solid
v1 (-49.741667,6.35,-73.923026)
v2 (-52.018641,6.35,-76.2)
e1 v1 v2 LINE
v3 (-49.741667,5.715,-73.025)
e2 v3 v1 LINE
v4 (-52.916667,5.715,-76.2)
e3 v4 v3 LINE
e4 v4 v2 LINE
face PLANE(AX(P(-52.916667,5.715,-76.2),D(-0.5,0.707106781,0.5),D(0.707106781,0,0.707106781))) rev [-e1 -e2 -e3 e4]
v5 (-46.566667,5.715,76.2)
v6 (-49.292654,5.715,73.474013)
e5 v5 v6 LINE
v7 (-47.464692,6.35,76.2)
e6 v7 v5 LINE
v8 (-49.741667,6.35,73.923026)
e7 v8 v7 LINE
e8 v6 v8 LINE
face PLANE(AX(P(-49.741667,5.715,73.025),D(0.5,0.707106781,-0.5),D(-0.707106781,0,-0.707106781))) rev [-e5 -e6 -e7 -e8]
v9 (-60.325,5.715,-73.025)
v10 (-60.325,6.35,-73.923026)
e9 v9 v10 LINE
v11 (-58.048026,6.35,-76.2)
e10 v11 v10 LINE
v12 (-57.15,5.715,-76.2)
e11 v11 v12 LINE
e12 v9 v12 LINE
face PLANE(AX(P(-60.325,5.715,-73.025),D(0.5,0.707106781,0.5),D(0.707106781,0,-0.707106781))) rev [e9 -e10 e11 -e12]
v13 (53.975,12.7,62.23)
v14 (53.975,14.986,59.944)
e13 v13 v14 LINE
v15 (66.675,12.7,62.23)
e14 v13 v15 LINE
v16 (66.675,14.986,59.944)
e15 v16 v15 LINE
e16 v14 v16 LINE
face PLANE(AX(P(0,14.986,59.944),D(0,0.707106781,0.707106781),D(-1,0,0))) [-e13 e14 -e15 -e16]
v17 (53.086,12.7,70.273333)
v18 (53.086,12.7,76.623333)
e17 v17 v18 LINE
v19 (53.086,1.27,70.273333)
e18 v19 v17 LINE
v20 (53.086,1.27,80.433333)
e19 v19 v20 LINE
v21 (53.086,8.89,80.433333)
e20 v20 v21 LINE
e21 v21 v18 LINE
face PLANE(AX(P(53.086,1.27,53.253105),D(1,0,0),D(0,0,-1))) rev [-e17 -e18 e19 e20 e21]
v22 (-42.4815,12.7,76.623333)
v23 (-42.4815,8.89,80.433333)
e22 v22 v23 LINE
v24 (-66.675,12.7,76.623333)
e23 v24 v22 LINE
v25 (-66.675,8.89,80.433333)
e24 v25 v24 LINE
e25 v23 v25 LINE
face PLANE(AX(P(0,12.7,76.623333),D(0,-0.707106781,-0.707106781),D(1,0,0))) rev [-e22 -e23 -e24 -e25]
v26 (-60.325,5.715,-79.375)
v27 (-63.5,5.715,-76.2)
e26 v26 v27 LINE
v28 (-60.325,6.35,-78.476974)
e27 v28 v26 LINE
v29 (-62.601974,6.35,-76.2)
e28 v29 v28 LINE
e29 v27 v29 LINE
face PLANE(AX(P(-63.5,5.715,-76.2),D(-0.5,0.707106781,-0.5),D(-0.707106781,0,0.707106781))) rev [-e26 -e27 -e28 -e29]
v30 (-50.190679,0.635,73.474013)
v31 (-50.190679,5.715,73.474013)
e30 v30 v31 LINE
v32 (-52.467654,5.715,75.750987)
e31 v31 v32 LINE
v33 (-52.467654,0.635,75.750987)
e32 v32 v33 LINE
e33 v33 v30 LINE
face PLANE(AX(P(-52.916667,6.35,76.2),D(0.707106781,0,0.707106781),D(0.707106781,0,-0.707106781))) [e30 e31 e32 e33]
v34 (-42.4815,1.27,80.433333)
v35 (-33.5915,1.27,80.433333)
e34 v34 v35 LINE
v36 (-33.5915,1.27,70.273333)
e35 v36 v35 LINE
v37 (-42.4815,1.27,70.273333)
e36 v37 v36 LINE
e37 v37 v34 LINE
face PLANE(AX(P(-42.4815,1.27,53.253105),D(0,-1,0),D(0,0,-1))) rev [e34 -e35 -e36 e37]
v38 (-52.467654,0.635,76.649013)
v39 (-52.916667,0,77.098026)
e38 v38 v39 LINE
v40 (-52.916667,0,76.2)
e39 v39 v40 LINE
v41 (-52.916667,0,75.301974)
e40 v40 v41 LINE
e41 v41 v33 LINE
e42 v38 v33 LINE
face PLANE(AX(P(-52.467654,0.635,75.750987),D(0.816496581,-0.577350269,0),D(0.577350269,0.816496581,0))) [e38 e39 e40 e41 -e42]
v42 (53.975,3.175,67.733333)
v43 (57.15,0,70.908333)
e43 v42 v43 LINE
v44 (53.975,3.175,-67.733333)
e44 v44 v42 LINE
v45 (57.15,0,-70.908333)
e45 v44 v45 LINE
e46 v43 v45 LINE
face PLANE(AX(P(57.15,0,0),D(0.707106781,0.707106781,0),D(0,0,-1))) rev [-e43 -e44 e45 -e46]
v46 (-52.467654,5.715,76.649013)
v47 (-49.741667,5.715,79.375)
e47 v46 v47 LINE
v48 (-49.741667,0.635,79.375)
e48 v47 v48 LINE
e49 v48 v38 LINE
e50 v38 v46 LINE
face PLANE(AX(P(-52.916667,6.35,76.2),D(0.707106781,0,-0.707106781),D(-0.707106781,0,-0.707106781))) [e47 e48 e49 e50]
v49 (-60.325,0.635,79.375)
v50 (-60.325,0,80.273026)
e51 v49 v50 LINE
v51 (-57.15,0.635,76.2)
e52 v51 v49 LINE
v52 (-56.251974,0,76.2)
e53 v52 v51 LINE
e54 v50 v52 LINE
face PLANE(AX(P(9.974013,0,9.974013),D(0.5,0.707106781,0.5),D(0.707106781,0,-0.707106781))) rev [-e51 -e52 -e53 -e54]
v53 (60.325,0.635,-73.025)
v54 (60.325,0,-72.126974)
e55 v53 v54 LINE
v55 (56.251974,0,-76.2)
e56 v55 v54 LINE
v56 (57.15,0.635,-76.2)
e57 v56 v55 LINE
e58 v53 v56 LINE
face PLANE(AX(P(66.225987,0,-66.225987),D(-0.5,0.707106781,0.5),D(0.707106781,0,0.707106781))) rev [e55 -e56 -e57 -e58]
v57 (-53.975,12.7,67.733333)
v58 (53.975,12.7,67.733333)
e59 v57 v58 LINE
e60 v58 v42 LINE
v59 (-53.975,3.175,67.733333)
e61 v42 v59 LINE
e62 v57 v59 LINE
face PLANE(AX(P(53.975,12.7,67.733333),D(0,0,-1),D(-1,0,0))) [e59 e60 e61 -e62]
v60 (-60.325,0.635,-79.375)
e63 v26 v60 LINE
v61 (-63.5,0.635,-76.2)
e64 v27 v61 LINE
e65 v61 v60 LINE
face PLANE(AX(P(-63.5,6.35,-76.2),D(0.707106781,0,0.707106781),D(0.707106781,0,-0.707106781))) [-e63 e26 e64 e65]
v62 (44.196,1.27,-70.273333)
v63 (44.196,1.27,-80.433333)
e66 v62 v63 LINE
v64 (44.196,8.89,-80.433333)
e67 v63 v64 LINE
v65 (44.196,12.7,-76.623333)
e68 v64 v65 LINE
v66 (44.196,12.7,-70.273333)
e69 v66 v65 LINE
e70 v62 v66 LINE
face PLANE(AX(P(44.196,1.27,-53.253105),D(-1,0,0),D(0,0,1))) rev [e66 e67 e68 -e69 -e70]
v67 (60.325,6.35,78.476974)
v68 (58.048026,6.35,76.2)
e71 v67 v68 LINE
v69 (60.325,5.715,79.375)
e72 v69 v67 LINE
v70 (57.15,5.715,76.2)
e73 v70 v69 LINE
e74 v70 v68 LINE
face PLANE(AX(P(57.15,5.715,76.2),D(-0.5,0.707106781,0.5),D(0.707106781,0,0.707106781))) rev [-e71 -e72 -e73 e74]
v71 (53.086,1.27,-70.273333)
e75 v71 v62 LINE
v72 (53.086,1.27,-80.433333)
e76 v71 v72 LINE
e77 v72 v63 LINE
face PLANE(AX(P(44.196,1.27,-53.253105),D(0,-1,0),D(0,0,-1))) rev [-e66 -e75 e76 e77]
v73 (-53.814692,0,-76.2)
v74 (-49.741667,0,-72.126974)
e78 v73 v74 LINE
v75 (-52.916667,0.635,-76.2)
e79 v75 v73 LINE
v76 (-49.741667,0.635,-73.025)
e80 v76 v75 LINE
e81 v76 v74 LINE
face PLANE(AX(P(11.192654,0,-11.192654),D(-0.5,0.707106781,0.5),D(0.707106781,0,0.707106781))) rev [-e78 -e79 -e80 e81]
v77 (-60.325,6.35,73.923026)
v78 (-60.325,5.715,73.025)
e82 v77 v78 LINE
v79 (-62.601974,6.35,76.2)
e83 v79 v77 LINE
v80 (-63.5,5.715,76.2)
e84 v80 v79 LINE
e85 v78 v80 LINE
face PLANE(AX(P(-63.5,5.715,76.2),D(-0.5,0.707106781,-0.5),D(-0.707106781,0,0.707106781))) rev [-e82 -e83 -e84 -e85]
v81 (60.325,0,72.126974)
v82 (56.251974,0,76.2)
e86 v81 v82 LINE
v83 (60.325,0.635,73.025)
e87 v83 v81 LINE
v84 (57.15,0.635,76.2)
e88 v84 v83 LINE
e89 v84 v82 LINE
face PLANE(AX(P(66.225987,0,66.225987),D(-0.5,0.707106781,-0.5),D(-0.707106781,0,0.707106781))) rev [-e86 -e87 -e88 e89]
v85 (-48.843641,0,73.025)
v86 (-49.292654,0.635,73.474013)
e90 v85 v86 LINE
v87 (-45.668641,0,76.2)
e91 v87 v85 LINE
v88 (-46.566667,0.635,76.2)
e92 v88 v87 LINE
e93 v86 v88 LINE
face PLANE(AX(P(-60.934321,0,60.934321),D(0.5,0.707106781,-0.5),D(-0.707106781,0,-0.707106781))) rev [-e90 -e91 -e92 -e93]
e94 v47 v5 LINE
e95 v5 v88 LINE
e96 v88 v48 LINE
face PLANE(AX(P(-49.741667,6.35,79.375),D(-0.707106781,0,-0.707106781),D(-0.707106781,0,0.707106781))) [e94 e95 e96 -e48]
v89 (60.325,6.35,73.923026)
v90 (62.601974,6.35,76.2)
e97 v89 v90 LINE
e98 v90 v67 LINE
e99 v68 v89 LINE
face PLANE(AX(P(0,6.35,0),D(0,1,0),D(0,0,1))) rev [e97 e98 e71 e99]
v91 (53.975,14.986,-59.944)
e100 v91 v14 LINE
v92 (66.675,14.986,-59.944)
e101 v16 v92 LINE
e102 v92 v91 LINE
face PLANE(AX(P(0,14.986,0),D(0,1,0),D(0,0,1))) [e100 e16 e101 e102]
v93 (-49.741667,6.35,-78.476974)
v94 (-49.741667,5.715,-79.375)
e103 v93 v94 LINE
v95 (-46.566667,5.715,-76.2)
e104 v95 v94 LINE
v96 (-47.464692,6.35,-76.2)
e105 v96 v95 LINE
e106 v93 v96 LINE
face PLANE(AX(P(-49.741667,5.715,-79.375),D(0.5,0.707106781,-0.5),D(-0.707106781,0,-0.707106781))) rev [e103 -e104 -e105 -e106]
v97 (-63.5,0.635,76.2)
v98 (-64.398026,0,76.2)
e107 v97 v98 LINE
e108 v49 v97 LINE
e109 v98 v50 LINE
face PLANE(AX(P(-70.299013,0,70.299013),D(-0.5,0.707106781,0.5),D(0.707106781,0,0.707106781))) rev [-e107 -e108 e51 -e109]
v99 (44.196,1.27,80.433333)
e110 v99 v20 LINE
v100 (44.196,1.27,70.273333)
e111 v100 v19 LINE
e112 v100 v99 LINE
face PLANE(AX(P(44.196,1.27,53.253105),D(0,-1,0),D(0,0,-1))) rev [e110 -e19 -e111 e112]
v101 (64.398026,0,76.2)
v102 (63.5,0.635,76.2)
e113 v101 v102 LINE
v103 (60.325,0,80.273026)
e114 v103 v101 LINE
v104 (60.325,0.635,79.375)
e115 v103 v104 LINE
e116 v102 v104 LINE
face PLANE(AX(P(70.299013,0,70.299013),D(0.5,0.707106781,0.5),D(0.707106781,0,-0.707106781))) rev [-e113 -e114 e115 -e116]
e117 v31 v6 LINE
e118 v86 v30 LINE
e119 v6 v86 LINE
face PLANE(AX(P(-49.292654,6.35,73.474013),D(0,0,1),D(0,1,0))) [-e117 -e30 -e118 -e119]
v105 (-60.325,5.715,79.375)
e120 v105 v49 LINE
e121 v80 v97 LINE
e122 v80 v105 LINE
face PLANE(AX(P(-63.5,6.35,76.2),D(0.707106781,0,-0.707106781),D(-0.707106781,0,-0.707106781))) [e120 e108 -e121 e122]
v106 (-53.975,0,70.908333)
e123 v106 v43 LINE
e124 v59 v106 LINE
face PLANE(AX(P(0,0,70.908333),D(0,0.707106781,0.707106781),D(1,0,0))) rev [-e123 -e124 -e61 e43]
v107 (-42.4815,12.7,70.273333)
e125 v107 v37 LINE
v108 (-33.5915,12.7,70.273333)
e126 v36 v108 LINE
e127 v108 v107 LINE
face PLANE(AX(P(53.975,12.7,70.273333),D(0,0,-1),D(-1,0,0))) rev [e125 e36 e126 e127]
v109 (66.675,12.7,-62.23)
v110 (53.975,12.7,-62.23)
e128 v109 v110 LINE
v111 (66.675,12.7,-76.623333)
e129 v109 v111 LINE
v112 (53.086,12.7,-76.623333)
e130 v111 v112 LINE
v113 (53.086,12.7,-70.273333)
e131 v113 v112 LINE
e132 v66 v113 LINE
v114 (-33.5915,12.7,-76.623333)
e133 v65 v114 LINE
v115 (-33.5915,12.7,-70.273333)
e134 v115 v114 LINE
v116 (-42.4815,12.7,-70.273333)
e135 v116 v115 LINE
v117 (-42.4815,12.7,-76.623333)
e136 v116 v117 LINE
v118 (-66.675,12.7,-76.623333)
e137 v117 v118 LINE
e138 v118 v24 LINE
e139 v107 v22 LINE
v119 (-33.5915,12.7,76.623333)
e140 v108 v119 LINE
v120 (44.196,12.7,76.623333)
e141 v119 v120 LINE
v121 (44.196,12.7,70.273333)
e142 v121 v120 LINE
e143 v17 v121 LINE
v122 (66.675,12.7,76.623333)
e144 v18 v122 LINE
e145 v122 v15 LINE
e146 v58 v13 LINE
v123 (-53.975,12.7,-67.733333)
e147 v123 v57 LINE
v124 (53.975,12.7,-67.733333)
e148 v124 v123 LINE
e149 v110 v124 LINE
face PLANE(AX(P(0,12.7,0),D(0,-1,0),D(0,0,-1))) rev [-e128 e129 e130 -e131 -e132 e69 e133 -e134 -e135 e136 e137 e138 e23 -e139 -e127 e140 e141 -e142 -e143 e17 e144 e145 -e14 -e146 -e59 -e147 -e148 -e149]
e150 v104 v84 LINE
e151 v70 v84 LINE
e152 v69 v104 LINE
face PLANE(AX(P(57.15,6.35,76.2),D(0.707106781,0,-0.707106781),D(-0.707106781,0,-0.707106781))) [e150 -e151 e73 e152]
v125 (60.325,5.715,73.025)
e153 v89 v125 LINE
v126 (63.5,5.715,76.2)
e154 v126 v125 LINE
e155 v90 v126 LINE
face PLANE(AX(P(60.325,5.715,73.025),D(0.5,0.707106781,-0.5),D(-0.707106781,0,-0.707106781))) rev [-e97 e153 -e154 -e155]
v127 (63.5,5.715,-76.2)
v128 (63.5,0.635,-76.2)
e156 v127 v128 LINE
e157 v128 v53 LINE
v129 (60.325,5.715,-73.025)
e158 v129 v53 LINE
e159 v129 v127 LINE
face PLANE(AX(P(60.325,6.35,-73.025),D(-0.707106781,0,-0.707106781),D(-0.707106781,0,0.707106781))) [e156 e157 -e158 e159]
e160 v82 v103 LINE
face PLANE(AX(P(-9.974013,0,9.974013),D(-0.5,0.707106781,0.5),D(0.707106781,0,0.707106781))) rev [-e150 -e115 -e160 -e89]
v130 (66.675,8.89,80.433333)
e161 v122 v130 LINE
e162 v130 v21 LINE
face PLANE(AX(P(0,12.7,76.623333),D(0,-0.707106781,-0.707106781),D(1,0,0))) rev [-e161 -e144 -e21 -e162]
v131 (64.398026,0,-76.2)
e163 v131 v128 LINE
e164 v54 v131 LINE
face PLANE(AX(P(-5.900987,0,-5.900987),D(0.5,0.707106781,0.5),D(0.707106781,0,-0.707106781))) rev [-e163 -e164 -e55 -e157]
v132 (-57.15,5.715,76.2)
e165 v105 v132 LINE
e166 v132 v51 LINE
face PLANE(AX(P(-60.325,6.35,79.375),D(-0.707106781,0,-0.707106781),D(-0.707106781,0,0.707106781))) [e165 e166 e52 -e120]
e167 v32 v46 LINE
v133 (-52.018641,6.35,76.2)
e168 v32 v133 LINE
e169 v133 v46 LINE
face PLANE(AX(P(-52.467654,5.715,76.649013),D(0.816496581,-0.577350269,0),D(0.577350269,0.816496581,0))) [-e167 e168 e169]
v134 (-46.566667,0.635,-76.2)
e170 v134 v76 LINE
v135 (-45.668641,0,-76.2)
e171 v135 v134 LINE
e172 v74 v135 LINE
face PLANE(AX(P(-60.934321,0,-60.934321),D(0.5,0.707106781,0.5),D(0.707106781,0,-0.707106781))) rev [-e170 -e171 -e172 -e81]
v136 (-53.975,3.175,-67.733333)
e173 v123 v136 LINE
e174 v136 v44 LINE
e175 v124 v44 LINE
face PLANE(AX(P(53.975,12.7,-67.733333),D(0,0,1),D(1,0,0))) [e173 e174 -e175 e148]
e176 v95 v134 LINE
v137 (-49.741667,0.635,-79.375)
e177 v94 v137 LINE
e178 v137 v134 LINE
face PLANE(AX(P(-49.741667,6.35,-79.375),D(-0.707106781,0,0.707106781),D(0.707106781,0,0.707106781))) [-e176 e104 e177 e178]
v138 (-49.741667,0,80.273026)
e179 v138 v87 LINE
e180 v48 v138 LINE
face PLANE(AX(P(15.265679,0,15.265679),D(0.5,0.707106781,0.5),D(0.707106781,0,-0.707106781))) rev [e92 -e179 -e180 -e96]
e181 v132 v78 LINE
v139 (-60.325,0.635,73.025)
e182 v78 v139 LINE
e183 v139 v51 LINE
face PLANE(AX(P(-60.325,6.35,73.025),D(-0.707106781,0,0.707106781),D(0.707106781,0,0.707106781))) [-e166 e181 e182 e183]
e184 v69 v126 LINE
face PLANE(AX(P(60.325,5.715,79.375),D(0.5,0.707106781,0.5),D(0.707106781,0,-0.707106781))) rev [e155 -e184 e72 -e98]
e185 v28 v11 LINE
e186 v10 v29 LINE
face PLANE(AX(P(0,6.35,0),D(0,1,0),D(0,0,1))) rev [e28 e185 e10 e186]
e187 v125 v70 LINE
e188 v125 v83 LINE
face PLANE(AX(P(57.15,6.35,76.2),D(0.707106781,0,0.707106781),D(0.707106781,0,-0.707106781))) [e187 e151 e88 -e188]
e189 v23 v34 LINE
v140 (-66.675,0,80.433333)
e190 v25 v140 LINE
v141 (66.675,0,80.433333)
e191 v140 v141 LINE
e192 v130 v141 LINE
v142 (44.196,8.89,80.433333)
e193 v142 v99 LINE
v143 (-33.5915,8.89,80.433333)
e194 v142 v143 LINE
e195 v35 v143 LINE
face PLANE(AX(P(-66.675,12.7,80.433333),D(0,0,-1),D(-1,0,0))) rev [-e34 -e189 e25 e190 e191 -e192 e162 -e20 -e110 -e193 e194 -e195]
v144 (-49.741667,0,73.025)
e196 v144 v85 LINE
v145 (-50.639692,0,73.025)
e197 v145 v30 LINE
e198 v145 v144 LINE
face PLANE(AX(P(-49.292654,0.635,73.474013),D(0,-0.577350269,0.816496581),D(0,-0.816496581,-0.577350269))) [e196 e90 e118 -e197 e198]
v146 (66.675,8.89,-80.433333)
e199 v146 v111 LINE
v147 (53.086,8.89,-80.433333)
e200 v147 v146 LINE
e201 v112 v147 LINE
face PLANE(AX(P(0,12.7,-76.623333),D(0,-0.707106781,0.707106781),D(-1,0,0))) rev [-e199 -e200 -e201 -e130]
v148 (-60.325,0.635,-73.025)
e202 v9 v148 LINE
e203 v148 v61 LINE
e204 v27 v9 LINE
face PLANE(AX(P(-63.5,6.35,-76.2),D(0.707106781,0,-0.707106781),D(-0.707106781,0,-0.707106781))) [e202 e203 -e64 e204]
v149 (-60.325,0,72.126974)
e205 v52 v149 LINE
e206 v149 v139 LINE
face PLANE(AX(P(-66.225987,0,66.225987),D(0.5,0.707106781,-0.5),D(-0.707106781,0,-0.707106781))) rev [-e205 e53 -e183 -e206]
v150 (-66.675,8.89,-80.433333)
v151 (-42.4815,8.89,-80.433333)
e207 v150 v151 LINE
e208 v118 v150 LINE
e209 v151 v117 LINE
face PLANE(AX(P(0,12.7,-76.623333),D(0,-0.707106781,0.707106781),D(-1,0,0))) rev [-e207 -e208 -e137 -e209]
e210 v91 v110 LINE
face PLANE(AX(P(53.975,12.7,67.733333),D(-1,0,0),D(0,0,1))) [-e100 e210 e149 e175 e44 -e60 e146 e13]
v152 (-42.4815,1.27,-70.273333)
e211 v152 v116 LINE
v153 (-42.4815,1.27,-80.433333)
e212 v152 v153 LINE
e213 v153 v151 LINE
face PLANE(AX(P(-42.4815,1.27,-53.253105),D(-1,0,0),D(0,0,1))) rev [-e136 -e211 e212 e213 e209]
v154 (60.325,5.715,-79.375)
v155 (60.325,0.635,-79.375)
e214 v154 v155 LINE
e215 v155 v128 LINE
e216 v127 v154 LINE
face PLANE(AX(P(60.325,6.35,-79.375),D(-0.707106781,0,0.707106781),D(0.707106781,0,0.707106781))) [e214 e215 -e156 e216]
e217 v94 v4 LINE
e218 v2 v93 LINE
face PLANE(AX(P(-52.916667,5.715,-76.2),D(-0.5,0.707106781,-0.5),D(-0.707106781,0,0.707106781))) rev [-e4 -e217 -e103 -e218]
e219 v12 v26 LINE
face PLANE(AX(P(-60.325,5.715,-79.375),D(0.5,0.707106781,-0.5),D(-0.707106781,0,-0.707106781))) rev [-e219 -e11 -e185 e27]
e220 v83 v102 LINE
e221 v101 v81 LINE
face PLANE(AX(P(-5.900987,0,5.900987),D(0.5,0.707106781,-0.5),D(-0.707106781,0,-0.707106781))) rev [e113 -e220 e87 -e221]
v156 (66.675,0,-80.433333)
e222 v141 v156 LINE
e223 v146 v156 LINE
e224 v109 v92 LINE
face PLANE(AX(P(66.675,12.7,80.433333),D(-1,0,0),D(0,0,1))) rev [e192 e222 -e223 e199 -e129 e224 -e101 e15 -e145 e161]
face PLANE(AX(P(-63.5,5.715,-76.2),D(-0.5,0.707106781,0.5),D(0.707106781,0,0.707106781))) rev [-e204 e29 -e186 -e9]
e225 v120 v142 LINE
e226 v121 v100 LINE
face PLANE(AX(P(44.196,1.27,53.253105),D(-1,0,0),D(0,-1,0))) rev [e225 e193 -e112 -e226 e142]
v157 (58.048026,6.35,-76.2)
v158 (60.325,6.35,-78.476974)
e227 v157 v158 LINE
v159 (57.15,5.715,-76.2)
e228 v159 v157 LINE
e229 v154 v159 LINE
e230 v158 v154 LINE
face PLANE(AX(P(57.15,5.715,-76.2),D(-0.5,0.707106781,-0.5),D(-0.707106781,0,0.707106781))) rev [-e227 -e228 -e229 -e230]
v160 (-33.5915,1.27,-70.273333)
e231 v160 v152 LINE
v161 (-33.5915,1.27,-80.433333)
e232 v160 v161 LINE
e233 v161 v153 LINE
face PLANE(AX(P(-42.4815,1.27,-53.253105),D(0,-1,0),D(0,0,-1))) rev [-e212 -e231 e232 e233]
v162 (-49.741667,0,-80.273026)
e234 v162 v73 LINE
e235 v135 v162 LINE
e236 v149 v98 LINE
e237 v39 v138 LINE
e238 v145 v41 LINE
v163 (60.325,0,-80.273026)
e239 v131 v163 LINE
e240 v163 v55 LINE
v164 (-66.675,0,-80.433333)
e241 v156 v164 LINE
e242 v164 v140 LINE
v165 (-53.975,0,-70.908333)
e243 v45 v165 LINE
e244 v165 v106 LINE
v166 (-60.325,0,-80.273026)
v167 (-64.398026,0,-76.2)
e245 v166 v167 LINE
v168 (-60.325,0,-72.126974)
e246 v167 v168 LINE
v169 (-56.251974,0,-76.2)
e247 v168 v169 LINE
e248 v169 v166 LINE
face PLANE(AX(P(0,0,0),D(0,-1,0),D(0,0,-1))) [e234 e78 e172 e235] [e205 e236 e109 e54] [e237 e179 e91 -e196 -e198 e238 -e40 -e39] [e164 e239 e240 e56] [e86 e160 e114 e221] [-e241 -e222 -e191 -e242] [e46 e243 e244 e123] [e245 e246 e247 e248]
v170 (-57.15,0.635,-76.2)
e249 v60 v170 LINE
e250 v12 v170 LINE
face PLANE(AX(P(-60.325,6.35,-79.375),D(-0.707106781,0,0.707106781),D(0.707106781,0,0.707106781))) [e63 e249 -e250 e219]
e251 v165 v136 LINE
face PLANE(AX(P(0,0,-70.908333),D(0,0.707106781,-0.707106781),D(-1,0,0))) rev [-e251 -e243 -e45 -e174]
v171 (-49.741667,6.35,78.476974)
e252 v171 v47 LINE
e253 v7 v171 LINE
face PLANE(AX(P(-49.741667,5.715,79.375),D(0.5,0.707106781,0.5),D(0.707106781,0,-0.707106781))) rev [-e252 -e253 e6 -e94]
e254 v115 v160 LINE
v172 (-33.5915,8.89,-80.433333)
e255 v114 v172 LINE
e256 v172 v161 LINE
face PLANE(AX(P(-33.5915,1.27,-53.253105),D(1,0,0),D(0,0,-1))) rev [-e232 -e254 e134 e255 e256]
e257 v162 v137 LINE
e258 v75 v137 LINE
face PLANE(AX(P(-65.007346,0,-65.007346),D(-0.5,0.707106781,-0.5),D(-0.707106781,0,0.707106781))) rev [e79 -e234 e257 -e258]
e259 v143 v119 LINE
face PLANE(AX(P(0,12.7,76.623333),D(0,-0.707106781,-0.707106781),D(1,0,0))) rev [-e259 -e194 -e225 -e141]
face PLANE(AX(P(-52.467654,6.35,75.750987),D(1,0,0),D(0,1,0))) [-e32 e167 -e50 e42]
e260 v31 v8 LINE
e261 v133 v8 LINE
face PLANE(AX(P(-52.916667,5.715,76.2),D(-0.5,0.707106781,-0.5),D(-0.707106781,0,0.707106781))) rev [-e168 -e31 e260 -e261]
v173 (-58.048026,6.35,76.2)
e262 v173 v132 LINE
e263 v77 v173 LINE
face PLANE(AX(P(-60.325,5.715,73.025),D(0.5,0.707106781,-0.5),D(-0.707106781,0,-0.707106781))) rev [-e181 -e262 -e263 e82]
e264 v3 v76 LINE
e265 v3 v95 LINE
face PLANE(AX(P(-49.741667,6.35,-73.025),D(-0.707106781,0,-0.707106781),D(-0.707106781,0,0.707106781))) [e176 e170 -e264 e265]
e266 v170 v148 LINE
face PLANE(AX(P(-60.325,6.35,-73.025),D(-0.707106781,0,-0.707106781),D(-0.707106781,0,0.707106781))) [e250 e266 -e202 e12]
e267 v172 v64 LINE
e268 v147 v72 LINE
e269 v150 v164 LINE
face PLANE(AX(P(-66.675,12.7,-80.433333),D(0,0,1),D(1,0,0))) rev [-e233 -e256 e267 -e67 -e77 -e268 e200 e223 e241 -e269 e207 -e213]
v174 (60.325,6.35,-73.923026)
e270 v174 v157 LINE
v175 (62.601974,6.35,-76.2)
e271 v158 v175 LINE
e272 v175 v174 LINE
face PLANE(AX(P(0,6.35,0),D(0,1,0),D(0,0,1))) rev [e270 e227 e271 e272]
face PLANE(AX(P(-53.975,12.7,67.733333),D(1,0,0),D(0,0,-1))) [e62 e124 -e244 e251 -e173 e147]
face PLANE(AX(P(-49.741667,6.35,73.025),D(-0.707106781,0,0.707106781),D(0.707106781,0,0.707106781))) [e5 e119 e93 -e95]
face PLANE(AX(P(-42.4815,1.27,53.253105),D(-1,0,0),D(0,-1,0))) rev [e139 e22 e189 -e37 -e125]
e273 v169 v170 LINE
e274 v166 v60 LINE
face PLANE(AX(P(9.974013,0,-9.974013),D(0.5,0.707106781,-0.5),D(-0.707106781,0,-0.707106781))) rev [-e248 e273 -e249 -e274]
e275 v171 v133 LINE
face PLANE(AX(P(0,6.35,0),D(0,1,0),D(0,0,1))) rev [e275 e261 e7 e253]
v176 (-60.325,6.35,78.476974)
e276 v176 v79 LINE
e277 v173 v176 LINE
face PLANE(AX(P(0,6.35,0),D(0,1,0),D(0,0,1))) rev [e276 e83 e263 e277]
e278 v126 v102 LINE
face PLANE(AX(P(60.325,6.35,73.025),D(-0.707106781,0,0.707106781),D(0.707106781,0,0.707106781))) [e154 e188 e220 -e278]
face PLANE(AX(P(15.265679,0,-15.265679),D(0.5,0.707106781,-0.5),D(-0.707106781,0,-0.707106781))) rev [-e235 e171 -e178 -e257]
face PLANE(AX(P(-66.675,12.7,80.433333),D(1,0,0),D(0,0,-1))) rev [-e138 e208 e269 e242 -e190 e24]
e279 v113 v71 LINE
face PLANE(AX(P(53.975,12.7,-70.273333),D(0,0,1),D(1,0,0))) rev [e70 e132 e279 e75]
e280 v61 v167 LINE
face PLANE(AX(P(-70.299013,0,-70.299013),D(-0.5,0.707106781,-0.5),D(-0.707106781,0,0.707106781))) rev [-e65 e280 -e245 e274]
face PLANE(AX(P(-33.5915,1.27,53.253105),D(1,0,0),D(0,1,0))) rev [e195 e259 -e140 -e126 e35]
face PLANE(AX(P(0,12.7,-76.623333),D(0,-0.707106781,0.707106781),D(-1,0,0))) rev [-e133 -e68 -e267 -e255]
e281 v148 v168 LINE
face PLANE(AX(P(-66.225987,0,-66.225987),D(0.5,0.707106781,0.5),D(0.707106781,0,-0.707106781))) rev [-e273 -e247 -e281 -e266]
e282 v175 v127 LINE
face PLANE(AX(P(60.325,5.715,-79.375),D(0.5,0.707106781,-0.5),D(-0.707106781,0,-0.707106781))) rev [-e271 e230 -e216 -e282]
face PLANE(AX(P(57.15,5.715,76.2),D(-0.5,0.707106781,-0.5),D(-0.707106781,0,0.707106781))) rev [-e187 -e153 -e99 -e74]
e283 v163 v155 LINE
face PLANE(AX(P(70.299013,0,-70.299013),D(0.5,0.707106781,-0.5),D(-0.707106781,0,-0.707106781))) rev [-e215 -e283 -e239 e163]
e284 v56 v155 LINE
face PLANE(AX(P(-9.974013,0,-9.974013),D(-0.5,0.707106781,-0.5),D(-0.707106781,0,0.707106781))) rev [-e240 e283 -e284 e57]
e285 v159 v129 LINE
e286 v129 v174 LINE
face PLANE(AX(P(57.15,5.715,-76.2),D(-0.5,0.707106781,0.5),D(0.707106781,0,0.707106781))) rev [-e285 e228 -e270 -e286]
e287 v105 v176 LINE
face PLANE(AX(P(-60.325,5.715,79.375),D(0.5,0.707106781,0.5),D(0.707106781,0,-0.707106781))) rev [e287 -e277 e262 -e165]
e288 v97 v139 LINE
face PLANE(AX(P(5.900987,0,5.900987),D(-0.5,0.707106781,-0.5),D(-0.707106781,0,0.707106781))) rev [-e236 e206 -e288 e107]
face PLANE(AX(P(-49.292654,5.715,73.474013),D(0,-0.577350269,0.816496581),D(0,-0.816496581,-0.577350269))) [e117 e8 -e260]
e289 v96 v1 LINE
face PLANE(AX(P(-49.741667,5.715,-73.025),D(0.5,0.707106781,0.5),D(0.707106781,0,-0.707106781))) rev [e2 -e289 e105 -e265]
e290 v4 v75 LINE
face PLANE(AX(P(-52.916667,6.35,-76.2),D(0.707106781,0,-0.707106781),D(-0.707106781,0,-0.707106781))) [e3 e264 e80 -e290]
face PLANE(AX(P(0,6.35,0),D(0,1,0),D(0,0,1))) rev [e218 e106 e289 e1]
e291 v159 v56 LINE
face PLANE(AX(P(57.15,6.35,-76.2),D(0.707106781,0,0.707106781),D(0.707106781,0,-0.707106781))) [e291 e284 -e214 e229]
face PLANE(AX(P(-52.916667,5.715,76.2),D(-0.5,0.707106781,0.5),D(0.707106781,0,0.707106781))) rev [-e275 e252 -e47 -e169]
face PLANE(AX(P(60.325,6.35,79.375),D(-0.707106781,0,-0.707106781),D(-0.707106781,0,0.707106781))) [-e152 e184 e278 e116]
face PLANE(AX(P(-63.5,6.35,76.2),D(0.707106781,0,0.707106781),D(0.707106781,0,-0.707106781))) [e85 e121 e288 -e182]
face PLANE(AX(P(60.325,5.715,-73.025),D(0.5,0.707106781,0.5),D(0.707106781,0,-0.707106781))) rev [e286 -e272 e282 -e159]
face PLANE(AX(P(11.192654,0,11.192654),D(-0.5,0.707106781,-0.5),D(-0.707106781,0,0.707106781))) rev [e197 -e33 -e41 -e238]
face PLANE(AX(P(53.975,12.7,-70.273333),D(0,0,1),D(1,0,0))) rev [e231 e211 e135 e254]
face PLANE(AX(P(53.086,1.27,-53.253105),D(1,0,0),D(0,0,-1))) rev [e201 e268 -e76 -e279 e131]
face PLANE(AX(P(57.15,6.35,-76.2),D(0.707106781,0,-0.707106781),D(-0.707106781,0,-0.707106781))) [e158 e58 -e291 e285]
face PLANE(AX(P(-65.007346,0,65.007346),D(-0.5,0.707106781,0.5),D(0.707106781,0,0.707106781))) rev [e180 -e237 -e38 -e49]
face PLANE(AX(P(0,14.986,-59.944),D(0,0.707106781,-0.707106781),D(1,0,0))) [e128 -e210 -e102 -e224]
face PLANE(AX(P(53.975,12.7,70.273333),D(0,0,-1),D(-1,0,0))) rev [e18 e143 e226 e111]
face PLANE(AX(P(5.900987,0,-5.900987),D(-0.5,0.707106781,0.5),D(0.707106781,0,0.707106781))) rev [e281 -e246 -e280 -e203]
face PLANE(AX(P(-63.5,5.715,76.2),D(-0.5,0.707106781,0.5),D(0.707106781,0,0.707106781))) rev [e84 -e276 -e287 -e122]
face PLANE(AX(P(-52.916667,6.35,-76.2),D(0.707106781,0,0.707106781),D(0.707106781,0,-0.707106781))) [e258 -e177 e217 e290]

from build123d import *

# Parameters (mm, degrees)
SKETCH2_W           = 133.35
SKETCH2_H           = 160.866666666
SKETCH2_W_2         = 107.95
SKETCH2_H_2         = 135.466666666
BOSS_EXTRUDE1_DEPTH = 12.7
CUT_EXTRUDE1_DEPTH  = 6.35
CHAMFER1_SIZE       = 0.635
CHAMFER3_SIZE       = 3.81
SKETCH5_W           = 8.89
SKETCH5_H           = 11.43
CUT_EXTRUDE2_DEPTH  = 10.16
SKETCH6_W           = 8.89
SKETCH6_H           = 11.43
CUT_EXTRUDE3_DEPTH  = 10.16
CHAMFER4_SIZE       = 3.175
SKETCH7_W           = 12.7
SKETCH7_H           = 124.46
BOSS_EXTRUDE2_DEPTH = 2.286
CHAMFER5_SIZE       = 2.286


with BuildPart() as part:
    # Sketch2 → Boss-Extrude1 (new body)
    with BuildSketch(Plane(origin=(0, 0, 0), x_dir=(1, 0, 0), z_dir=(0, 1, 0))):
        Rectangle(SKETCH2_W, SKETCH2_H)
        Rectangle(SKETCH2_W_2, SKETCH2_H_2, mode=Mode.SUBTRACT)
    extrude(amount=BOSS_EXTRUDE1_DEPTH)

    # Sketch4 → Cut-Extrude1 (cut)
    with BuildSketch(Plane(origin=(0, 0, 0), x_dir=(1, 0, 0), z_dir=(0, 1, 0))):
        Polygon((-63.5, 76.2), (-60.325, 79.375), (-57.15, 76.2), (-60.325, 73.025), align=None)
        Polygon((-52.916666667, 76.2), (-49.741666667, 79.375), (-46.566666667, 76.2), (-49.741666667, 73.025), align=None)
        Polygon((57.15, 76.2), (60.325, 79.375), (63.5, 76.2), (60.325, 73.025), align=None)
        Polygon((57.15, -76.2), (60.325, -73.025), (63.5, -76.2), (60.325, -79.375), align=None)
        Polygon((-52.916666667, -76.2), (-49.741666667, -73.025), (-46.566666667, -76.2), (-49.741666667, -79.375), align=None)
        Polygon((-63.5, -76.2), (-60.325, -73.025), (-57.15, -76.2), (-60.325, -79.375), align=None)
    extrude(amount=CUT_EXTRUDE1_DEPTH, mode=Mode.SUBTRACT)

    # Chamfer1
    chamfer1_edges = [part.edges().sort_by_distance(p)[0] for p in [
        (-61.9125, 0, 77.7875),
        (-58.7375, 0, 77.7875),
        (-58.7375, 0, 74.6125),
        (-61.9125, 0, 74.6125),
        (-61.9125, 6.35, 77.7875),
        (-58.7375, 6.35, 77.7875),
        (-58.7375, 6.35, 74.6125),
        (-61.9125, 6.35, 74.6125),
        (-51.329166667, 0, 77.7875),
        (-52.916666667, 3.175, 76.2),
        (-48.154166667, 0, 77.7875),
        (-48.154166667, 0, 74.6125),
        (-51.329166667, 0, 74.6125),
        (-49.741666667, 3.175, 73.025),
        (-51.329166667, 6.35, 77.7875),
        (-48.154166667, 6.35, 77.7875),
        (-48.154166667, 6.35, 74.6125),
        (-51.329166667, 6.35, 74.6125),
        (58.7375, 0, 77.7875),
        (61.9125, 0, 77.7875),
        (61.9125, 0, 74.6125),
        (58.7375, 0, 74.6125),
        (58.7375, 6.35, 77.7875),
        (61.9125, 6.35, 77.7875),
        (61.9125, 6.35, 74.6125),
        (58.7375, 6.35, 74.6125),
        (58.7375, 0, -74.6125),
        (61.9125, 0, -74.6125),
        (61.9125, 0, -77.7875),
        (58.7375, 0, -77.7875),
        (58.7375, 6.35, -74.6125),
        (61.9125, 6.35, -74.6125),
        (61.9125, 6.35, -77.7875),
        (58.7375, 6.35, -77.7875),
        (-51.329166667, 0, -74.6125),
        (-48.154166667, 0, -74.6125),
        (-48.154166667, 0, -77.7875),
        (-51.329166667, 0, -77.7875),
        (-51.329166667, 6.35, -74.6125),
        (-48.154166667, 6.35, -74.6125),
        (-48.154166667, 6.35, -77.7875),
        (-51.329166667, 6.35, -77.7875),
        (-61.9125, 0, -74.6125),
        (-58.7375, 0, -74.6125),
        (-58.7375, 0, -77.7875),
        (-61.9125, 0, -77.7875),
        (-61.9125, 6.35, -74.6125),
        (-58.7375, 6.35, -74.6125),
        (-58.7375, 6.35, -77.7875),
        (-61.9125, 6.35, -77.7875),
    ]]
    chamfer(chamfer1_edges, length=CHAMFER1_SIZE)

    # Chamfer3
    chamfer3_edges = [part.edges().sort_by_distance(p)[0] for p in [
        (0, 12.7, -80.433333333),
        (0, 12.7, 80.433333333),
    ]]
    chamfer(chamfer3_edges, length=CHAMFER3_SIZE)

    # Sketch5 → Cut-Extrude2 (cut)
    with BuildSketch(Plane.XY.offset(80.433333333)):
        with Locations((-38.0365, 6.985)):
            Rectangle(SKETCH5_W, SKETCH5_H)
        with Locations((48.641, 6.985)):
            Rectangle(SKETCH5_W, SKETCH5_H)
    extrude(amount=-CUT_EXTRUDE2_DEPTH, mode=Mode.SUBTRACT)

    # Sketch6 → Cut-Extrude3 (cut)
    with BuildSketch(Plane(origin=(0, 0, -80.433333333), x_dir=(-1, 0, 0), z_dir=(0, 0, -1))):
        with Locations((38.0365, 6.985)):
            Rectangle(SKETCH6_W, SKETCH6_H)
        with Locations((-48.641, 6.985)):
            Rectangle(SKETCH6_W, SKETCH6_H)
    extrude(amount=-CUT_EXTRUDE3_DEPTH, mode=Mode.SUBTRACT)

    # Chamfer4
    chamfer4_edges = [part.edges().sort_by_distance(p)[0] for p in [
        (53.975, 0, 0),
        (0, 0, -67.733333333),
        (0, 0, 67.733333333),
    ]]
    chamfer(chamfer4_edges, length=CHAMFER4_SIZE)

    # Sketch7 → Boss-Extrude2 (add)
    with BuildSketch(Plane(origin=(0, 12.7, 0), x_dir=(1, 0, 0), z_dir=(0, 1, 0))):
        with Locations((60.325, 0)):
            Rectangle(SKETCH7_W, SKETCH7_H)
    extrude(amount=BOSS_EXTRUDE2_DEPTH)

    # Chamfer5
    chamfer5_edges = [part.edges().sort_by_distance(p)[0] for p in [
        (60.325, 14.986, 62.23),
        (60.325, 14.986, -62.23),
    ]]
    chamfer(chamfer5_edges, length=CHAMFER5_SIZE - 0.0001)  # a hair under: the kernel refuses the full size


solid = part.part
